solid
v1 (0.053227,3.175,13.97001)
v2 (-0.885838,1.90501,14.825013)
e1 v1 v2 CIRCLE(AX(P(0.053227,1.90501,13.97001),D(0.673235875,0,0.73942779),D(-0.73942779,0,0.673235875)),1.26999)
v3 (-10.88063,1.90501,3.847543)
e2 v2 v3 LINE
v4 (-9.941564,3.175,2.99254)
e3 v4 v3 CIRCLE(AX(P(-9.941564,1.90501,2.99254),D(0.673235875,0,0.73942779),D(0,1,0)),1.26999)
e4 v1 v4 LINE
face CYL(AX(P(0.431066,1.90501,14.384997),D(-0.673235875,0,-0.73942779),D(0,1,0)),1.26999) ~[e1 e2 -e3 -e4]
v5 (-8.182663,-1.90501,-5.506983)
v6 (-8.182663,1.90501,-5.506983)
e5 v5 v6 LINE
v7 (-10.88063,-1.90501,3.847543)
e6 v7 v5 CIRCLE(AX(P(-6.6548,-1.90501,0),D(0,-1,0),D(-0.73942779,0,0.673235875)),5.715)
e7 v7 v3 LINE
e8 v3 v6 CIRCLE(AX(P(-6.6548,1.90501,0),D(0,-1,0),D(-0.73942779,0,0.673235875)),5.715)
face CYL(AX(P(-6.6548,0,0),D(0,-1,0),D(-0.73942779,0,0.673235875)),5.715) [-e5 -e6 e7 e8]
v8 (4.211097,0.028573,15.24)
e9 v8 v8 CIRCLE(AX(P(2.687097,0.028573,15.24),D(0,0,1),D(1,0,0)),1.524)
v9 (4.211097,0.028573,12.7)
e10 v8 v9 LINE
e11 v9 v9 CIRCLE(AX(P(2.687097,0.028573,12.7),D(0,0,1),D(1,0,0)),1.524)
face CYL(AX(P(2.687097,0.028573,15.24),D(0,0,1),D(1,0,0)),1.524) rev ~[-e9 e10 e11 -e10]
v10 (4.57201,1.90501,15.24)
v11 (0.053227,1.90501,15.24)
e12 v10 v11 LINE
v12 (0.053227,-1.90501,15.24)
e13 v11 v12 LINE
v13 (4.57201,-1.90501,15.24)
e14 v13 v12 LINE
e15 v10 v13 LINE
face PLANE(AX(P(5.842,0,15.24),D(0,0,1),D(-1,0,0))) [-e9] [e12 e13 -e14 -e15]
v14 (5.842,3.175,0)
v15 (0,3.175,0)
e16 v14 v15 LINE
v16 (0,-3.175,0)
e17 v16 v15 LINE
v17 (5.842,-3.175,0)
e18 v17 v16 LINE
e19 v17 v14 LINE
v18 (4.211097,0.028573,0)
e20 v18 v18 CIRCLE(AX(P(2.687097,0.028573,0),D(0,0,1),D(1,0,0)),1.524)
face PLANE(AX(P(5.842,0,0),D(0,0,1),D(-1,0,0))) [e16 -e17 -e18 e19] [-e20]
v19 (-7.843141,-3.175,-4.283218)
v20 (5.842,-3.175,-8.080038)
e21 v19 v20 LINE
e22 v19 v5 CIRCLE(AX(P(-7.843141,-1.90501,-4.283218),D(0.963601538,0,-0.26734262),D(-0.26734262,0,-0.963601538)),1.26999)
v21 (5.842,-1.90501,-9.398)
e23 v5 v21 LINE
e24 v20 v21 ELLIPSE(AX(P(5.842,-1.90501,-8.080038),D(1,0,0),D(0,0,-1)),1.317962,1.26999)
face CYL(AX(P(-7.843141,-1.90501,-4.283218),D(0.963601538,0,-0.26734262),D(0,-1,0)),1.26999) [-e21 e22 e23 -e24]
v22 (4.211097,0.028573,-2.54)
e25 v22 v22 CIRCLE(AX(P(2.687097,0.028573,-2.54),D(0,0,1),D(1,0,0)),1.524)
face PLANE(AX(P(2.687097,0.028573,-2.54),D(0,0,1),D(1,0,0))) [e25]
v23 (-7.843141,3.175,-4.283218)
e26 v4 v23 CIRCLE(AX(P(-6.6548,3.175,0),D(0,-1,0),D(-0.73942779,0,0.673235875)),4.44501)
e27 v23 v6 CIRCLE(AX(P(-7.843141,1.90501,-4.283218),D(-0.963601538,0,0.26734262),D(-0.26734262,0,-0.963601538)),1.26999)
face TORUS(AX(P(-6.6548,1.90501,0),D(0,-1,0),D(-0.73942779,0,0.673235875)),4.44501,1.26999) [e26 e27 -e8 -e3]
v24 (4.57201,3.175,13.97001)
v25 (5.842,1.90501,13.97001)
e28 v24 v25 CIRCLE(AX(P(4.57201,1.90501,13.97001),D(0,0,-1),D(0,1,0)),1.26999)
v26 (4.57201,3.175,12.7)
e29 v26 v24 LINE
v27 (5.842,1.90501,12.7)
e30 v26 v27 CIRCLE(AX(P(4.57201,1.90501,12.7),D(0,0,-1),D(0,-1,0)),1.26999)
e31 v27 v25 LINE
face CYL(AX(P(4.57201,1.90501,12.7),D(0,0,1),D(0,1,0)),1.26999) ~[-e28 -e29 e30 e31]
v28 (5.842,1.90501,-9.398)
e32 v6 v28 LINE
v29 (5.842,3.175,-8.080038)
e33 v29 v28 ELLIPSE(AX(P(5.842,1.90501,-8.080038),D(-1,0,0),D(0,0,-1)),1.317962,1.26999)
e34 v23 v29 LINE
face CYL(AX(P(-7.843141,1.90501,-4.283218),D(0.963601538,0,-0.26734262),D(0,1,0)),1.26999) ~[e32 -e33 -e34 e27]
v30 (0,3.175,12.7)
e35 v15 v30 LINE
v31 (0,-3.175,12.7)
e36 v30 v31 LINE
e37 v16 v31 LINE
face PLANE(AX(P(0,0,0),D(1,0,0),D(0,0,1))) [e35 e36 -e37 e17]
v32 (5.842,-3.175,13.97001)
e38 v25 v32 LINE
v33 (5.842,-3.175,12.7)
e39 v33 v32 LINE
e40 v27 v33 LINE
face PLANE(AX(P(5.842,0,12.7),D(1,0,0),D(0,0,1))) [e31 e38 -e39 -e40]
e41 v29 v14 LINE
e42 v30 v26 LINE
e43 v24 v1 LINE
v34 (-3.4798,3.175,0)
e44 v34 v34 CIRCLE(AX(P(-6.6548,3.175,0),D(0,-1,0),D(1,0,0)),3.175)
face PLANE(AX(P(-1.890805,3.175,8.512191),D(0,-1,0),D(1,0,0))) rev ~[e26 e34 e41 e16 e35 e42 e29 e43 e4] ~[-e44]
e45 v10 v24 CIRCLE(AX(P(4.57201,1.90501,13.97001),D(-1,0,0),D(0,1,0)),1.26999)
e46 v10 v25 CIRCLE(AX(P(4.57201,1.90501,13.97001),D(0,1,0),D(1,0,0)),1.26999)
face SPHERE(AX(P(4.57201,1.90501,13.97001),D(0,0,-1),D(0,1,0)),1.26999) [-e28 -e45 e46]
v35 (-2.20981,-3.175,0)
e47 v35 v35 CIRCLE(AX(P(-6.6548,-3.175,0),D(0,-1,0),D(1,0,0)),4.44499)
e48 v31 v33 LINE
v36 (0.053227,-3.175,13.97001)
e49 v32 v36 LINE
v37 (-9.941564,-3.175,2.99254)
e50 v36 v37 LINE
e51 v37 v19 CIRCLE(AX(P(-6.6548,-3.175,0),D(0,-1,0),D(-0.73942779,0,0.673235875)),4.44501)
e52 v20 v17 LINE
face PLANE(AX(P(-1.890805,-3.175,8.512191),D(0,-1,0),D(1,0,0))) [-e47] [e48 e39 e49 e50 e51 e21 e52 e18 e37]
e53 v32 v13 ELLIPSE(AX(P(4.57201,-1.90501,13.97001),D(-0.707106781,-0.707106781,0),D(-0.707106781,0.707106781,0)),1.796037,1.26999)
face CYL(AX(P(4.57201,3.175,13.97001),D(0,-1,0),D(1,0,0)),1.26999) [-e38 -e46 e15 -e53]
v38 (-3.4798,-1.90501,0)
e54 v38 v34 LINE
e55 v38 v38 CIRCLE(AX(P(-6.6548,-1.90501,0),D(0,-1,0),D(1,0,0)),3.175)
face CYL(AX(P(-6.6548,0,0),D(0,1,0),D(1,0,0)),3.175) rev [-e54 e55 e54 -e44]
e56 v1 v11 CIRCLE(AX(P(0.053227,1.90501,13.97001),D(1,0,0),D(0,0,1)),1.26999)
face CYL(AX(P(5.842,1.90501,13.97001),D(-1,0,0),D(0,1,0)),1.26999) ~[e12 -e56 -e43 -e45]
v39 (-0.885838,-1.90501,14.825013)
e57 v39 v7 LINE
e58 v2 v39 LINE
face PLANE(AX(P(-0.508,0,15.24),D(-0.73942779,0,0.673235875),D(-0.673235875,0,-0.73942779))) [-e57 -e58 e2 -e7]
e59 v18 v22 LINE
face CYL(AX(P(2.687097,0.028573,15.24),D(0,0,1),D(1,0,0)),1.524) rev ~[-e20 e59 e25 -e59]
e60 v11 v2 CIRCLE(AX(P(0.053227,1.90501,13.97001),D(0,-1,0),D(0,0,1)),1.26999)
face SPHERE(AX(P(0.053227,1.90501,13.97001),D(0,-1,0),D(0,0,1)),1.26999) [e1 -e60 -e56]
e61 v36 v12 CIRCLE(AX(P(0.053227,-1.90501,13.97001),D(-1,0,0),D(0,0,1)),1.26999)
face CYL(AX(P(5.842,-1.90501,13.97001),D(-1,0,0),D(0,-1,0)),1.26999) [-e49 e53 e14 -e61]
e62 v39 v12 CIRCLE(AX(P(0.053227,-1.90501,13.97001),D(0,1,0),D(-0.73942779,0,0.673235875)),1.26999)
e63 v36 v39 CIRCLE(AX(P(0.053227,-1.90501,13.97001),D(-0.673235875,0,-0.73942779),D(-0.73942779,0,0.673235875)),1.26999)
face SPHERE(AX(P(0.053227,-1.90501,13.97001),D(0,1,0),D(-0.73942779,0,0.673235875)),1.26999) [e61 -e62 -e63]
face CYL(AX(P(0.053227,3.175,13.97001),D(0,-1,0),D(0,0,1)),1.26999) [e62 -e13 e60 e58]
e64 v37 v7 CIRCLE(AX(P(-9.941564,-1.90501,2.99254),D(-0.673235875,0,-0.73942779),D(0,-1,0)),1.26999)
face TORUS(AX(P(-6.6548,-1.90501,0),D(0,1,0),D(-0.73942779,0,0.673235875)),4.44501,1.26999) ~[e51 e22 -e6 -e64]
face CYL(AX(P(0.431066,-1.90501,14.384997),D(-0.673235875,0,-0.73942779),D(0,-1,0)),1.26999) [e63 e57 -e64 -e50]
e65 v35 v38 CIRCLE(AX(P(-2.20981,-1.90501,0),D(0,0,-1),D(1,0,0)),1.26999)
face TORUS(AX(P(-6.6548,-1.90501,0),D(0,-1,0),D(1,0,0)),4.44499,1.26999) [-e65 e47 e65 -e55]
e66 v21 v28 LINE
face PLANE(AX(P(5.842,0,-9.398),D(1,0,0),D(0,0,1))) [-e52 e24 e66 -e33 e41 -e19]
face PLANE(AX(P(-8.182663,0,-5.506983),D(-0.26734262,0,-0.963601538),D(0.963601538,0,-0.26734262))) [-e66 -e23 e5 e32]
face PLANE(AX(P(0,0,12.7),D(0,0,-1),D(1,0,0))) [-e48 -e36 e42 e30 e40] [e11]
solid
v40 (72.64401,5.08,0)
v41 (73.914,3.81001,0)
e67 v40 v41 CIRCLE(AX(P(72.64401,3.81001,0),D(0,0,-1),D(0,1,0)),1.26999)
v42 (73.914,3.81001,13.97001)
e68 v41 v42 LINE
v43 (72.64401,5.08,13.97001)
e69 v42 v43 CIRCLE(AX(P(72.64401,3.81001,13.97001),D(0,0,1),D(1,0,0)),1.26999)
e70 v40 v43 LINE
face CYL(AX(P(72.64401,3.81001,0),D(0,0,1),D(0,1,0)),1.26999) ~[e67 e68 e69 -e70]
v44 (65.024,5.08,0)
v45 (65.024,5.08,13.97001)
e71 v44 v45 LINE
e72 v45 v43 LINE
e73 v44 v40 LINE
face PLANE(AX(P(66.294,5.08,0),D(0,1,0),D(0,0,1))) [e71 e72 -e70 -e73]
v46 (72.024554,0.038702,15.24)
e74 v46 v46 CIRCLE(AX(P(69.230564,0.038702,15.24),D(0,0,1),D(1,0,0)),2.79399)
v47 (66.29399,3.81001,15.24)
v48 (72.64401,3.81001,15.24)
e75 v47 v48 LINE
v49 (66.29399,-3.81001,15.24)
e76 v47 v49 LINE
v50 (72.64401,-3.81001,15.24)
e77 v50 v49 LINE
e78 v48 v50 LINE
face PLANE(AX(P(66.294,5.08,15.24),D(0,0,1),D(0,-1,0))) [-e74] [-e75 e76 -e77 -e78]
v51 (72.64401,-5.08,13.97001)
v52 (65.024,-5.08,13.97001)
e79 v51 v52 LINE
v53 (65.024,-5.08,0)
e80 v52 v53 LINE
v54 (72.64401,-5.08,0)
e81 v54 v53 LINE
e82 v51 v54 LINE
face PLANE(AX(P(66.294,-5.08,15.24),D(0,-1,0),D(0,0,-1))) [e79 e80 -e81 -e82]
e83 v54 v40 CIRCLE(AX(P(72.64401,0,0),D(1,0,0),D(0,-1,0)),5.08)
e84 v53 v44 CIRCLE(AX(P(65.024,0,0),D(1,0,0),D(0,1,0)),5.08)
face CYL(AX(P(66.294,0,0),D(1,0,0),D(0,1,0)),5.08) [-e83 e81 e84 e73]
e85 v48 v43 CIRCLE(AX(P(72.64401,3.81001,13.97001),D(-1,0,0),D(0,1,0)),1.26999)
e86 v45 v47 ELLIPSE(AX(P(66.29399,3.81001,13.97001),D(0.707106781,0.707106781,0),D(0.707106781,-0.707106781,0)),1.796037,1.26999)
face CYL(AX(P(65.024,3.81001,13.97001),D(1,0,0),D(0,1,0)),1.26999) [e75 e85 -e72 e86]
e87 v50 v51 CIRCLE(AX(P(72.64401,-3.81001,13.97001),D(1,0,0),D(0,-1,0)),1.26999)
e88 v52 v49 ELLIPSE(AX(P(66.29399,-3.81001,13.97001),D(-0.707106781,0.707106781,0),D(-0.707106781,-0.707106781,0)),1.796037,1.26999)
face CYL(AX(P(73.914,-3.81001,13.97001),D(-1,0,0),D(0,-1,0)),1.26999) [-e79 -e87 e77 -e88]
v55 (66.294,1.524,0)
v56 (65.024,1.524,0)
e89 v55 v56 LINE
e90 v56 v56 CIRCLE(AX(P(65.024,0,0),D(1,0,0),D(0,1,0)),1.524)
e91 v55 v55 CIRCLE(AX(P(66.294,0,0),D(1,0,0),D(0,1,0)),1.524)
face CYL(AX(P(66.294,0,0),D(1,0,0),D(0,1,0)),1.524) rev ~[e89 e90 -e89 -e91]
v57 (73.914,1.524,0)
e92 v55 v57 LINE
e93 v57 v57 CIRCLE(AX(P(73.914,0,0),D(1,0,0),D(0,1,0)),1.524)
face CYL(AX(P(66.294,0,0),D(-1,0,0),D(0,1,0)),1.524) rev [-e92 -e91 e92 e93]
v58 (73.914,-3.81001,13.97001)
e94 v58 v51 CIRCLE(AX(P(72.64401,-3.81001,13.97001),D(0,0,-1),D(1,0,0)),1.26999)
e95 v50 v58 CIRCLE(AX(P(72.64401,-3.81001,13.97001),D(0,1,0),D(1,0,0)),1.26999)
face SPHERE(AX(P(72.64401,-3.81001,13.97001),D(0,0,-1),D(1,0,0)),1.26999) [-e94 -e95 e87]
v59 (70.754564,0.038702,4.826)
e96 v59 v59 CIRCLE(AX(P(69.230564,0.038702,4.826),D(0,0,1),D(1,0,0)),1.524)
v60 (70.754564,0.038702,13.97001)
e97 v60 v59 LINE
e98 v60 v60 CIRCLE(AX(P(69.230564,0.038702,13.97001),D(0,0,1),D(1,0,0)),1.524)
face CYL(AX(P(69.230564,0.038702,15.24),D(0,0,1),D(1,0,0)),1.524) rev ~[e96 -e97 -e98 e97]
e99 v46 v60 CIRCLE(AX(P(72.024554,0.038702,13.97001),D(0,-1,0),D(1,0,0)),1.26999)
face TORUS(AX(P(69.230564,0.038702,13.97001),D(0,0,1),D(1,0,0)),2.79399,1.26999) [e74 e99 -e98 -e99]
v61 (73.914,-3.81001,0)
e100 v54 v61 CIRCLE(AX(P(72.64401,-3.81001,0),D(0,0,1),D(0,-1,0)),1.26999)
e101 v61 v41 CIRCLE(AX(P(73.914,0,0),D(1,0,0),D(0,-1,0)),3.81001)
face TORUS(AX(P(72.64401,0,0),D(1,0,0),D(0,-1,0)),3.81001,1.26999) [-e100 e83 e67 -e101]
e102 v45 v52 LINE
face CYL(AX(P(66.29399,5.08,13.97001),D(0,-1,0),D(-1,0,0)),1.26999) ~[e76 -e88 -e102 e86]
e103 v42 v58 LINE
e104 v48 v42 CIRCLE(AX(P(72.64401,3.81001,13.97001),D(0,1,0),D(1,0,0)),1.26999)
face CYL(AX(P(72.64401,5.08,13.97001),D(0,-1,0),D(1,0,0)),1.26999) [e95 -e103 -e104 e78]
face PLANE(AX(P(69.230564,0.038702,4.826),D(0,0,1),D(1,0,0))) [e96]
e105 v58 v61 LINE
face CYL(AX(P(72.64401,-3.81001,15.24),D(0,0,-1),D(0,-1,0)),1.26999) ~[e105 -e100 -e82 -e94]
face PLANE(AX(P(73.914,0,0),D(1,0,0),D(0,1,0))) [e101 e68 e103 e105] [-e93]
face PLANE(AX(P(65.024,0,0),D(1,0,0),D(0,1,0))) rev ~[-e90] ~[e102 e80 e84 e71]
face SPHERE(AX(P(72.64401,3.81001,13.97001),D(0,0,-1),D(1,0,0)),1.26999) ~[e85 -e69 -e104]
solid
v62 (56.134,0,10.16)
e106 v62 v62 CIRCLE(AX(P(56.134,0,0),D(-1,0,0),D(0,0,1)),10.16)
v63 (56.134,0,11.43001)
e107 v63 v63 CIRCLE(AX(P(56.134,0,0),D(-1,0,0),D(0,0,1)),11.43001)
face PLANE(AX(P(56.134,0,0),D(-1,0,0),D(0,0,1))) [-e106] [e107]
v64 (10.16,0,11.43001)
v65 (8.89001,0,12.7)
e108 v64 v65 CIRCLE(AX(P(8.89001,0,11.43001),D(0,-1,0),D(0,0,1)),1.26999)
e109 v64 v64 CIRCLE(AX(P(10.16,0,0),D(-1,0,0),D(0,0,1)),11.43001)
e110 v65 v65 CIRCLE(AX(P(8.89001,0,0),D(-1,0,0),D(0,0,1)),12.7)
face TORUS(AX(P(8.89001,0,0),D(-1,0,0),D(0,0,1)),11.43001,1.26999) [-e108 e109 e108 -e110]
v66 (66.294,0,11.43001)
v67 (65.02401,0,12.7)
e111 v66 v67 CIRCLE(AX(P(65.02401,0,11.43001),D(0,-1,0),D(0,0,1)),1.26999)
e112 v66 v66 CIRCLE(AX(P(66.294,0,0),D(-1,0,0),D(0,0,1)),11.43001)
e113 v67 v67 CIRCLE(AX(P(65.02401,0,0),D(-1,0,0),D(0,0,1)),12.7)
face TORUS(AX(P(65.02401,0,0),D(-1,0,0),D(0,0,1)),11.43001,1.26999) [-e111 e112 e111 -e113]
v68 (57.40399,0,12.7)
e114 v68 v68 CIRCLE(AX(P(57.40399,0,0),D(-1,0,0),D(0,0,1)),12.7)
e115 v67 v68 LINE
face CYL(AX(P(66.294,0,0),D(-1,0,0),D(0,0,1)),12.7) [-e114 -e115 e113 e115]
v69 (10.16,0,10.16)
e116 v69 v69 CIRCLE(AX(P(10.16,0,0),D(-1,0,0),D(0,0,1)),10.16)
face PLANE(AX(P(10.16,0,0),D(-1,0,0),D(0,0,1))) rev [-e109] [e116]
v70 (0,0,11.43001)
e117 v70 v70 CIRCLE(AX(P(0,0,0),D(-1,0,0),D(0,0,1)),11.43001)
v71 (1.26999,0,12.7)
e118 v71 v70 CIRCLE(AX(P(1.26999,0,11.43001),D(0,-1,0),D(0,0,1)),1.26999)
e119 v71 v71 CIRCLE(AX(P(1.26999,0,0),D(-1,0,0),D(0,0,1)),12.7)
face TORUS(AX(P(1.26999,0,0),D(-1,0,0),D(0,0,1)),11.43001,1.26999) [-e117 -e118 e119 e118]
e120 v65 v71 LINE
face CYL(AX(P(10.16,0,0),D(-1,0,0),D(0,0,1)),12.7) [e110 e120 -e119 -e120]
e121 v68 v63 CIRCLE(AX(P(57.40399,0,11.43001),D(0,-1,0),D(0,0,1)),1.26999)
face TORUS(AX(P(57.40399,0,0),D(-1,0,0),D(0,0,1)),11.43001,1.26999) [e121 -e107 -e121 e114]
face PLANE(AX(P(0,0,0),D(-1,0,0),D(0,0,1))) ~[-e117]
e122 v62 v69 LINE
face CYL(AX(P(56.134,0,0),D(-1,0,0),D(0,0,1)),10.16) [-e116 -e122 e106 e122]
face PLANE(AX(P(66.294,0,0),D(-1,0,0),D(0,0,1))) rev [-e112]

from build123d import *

# Parameters (mm, degrees)
F0_W          = 5.842
F0_H          = 12.7
F0_R          = 3.175
F2_DEPTH      = 3.175
F3_R          = 1.524
F4_DEPTH      = 7.62
F4_DEPTH_BACK = 1.27
F5_R          = 1.524
F6_DEPTH      = 10.414
F7_R          = 1.524
F8_DEPTH      = 17.78
F9_R          = 1.26999
F9_2_R        = 1.26999
F9_3_R        = 1.26999


# Not quite as in the source:
# - a fillet or chamfer is up to 0.001 mm smaller than in the source, because OpenCascade refuses the exact size


with BuildPart() as f1:
    # F0 (on Front) → F1 (revolve)
    with BuildSketch(Plane.XZ):
        Polygon((5.842, 12.7), (5.842, 0), (66.294, 0), (66.294, 12.7), (56.134, 12.7), (56.134, 10.16), (10.16, 10.16), (10.16, 12.7), align=None)
        with Locations((2.921, 6.35)):
            Rectangle(F0_W, F0_H)
    revolve(axis=Axis((33.147, 0, 0), (-1, 0, 0)))

    # F9 (radius 1.27 in the source; OpenCascade refuses exactly that, so slightly less here)
    f9_edges = [f1.edges().sort_by_distance(p)[0] for p in [
        (10.16, 0, -12.7),
        (0, 0, -12.7),
        (66.294, 0, -12.7),
        (56.134, 0, -12.7),
    ]]
    fillet(f9_edges, radius=F9_R)


with BuildPart() as f2:
    # F0 (on Front) → F2 (new body, symmetric)
    with BuildSketch(Plane.XZ):
        with BuildLine():
            Line((-0.9398, 0), (0, 0))
            Line((0, 0), (0, 12.7))
            Line((0, 12.7), (5.842, 12.7))
            Line((5.842, 12.7), (5.842, 15.24))
            Line((5.842, 15.24), (-0.508, 15.24))
            Line((-0.508, 15.24), (-10.8806298187, 3.8475430269))
            ThreePointArc((-10.8806298187, 3.8475430269), (-4.5919612295, 5.3297205562), (-0.9398, 0))
        make_face()
        with BuildLine():
            Line((5.842, 0), (0, 0))
            Line((0, 0), (-0.9398, 0))
            ThreePointArc((-0.9398, 0), (-3.1957909266, -4.5493385486), (-8.1826630726, -5.5069827884))
            Line((-8.1826630726, -5.5069827884), (5.842, -9.398))
            Line((5.842, -9.398), (5.842, 0))
        make_face()
        with BuildLine():
            ThreePointArc((-8.1826630726, -5.5069827884), (-3.1957909266, -4.5493385486), (-0.9398, 0))
            ThreePointArc((-0.9398, 0), (-4.5919612295, 5.3297205562), (-10.8806298187, 3.8475430269))
            ThreePointArc((-10.8806298187, 3.8475430269), (-12.1459778134, -1.5837270034), (-8.1826630726, -5.5069827884))
        make_face()
        with Locations((-6.6548, 0)):
            Circle(F0_R, mode=Mode.SUBTRACT)
    extrude(amount=F2_DEPTH, both=True)

    # F7 (on face) → F8 (cut)
    with BuildSketch(Plane.XY.offset(15.24)):
        with Locations((2.6870968286, 0.0285728838)):
            Circle(F7_R)
    extrude(amount=-F8_DEPTH, mode=Mode.SUBTRACT)

    # F9#2 (radius 1.27 in the source; OpenCascade refuses exactly that, so slightly less here)
    f9_2_edges = [f2.edges().sort_by_distance(p)[0] for p in [
        (2.667, -3.175, 15.24),
        (5.842, 3.175, 13.97),
        (-0.508, 0, 15.24),
        (2.667, 3.175, 15.24),
        (-5.694315, 3.175, 9.543772),
        (-10.88063, 0, 3.847543),
        (-5.694315, -3.175, 9.543772),
        (-9.8298, -3.175, 0),
        (5.842, 0, 15.24),
        (-1.170332, 3.175, -7.452491),
        (-1.170332, -3.175, -7.452491),
        (-12.145978, 3.175, -1.583727),
        (-12.145978, -3.175, -1.583727),
    ]]
    fillet(f9_2_edges, radius=F9_2_R)


with BuildPart() as f4:
    # F3 (on face) → F4 (new body, two sides)
    with BuildSketch(Plane.YZ.offset(66.294)) as f4_sk:
        with BuildLine():
            ThreePointArc((-5.08, 0), (0, -5.08), (5.08, 0))
            ThreePointArc((5.08, 0), (0, 5.08), (-5.08, 0))
        make_face()
        Circle(F3_R, mode=Mode.SUBTRACT)
        with BuildLine():
            ThreePointArc((-5.08, 0), (0, 5.08), (5.08, 0))
            Line((5.08, 0), (5.08, 15.24))
            Line((5.08, 15.24), (-5.08, 15.24))
            Line((-5.08, 15.24), (-5.08, 0))
        make_face()
    extrude(amount=F4_DEPTH)
    extrude(f4_sk.sketch, amount=-F4_DEPTH_BACK)

    # F5 (on face) → F6 (cut)
    with BuildSketch(Plane.XY.offset(15.24)):
        with Locations((69.2305639386, 0.0387020955)):
            Circle(F5_R)
    extrude(amount=-F6_DEPTH, mode=Mode.SUBTRACT)

    # F9#3 (radius 1.27 in the source; OpenCascade refuses exactly that, so slightly less here)
    f9_3_edges = [f4.edges().sort_by_distance(p)[0] for p in [
        (73.914, 5.08, 7.62),
        (73.914, 0, 15.24),
        (69.469, 5.08, 15.24),
        (69.469, -5.08, 15.24),
        (65.024, 0, 15.24),
        (67.706564, 0.038702, 15.24),
        (73.914, 0, -5.08),
        (73.914, -5.08, 7.62),
    ]]
    fillet(f9_3_edges, radius=F9_3_R)


solid = Compound([f1.part, f2.part, f4.part])
